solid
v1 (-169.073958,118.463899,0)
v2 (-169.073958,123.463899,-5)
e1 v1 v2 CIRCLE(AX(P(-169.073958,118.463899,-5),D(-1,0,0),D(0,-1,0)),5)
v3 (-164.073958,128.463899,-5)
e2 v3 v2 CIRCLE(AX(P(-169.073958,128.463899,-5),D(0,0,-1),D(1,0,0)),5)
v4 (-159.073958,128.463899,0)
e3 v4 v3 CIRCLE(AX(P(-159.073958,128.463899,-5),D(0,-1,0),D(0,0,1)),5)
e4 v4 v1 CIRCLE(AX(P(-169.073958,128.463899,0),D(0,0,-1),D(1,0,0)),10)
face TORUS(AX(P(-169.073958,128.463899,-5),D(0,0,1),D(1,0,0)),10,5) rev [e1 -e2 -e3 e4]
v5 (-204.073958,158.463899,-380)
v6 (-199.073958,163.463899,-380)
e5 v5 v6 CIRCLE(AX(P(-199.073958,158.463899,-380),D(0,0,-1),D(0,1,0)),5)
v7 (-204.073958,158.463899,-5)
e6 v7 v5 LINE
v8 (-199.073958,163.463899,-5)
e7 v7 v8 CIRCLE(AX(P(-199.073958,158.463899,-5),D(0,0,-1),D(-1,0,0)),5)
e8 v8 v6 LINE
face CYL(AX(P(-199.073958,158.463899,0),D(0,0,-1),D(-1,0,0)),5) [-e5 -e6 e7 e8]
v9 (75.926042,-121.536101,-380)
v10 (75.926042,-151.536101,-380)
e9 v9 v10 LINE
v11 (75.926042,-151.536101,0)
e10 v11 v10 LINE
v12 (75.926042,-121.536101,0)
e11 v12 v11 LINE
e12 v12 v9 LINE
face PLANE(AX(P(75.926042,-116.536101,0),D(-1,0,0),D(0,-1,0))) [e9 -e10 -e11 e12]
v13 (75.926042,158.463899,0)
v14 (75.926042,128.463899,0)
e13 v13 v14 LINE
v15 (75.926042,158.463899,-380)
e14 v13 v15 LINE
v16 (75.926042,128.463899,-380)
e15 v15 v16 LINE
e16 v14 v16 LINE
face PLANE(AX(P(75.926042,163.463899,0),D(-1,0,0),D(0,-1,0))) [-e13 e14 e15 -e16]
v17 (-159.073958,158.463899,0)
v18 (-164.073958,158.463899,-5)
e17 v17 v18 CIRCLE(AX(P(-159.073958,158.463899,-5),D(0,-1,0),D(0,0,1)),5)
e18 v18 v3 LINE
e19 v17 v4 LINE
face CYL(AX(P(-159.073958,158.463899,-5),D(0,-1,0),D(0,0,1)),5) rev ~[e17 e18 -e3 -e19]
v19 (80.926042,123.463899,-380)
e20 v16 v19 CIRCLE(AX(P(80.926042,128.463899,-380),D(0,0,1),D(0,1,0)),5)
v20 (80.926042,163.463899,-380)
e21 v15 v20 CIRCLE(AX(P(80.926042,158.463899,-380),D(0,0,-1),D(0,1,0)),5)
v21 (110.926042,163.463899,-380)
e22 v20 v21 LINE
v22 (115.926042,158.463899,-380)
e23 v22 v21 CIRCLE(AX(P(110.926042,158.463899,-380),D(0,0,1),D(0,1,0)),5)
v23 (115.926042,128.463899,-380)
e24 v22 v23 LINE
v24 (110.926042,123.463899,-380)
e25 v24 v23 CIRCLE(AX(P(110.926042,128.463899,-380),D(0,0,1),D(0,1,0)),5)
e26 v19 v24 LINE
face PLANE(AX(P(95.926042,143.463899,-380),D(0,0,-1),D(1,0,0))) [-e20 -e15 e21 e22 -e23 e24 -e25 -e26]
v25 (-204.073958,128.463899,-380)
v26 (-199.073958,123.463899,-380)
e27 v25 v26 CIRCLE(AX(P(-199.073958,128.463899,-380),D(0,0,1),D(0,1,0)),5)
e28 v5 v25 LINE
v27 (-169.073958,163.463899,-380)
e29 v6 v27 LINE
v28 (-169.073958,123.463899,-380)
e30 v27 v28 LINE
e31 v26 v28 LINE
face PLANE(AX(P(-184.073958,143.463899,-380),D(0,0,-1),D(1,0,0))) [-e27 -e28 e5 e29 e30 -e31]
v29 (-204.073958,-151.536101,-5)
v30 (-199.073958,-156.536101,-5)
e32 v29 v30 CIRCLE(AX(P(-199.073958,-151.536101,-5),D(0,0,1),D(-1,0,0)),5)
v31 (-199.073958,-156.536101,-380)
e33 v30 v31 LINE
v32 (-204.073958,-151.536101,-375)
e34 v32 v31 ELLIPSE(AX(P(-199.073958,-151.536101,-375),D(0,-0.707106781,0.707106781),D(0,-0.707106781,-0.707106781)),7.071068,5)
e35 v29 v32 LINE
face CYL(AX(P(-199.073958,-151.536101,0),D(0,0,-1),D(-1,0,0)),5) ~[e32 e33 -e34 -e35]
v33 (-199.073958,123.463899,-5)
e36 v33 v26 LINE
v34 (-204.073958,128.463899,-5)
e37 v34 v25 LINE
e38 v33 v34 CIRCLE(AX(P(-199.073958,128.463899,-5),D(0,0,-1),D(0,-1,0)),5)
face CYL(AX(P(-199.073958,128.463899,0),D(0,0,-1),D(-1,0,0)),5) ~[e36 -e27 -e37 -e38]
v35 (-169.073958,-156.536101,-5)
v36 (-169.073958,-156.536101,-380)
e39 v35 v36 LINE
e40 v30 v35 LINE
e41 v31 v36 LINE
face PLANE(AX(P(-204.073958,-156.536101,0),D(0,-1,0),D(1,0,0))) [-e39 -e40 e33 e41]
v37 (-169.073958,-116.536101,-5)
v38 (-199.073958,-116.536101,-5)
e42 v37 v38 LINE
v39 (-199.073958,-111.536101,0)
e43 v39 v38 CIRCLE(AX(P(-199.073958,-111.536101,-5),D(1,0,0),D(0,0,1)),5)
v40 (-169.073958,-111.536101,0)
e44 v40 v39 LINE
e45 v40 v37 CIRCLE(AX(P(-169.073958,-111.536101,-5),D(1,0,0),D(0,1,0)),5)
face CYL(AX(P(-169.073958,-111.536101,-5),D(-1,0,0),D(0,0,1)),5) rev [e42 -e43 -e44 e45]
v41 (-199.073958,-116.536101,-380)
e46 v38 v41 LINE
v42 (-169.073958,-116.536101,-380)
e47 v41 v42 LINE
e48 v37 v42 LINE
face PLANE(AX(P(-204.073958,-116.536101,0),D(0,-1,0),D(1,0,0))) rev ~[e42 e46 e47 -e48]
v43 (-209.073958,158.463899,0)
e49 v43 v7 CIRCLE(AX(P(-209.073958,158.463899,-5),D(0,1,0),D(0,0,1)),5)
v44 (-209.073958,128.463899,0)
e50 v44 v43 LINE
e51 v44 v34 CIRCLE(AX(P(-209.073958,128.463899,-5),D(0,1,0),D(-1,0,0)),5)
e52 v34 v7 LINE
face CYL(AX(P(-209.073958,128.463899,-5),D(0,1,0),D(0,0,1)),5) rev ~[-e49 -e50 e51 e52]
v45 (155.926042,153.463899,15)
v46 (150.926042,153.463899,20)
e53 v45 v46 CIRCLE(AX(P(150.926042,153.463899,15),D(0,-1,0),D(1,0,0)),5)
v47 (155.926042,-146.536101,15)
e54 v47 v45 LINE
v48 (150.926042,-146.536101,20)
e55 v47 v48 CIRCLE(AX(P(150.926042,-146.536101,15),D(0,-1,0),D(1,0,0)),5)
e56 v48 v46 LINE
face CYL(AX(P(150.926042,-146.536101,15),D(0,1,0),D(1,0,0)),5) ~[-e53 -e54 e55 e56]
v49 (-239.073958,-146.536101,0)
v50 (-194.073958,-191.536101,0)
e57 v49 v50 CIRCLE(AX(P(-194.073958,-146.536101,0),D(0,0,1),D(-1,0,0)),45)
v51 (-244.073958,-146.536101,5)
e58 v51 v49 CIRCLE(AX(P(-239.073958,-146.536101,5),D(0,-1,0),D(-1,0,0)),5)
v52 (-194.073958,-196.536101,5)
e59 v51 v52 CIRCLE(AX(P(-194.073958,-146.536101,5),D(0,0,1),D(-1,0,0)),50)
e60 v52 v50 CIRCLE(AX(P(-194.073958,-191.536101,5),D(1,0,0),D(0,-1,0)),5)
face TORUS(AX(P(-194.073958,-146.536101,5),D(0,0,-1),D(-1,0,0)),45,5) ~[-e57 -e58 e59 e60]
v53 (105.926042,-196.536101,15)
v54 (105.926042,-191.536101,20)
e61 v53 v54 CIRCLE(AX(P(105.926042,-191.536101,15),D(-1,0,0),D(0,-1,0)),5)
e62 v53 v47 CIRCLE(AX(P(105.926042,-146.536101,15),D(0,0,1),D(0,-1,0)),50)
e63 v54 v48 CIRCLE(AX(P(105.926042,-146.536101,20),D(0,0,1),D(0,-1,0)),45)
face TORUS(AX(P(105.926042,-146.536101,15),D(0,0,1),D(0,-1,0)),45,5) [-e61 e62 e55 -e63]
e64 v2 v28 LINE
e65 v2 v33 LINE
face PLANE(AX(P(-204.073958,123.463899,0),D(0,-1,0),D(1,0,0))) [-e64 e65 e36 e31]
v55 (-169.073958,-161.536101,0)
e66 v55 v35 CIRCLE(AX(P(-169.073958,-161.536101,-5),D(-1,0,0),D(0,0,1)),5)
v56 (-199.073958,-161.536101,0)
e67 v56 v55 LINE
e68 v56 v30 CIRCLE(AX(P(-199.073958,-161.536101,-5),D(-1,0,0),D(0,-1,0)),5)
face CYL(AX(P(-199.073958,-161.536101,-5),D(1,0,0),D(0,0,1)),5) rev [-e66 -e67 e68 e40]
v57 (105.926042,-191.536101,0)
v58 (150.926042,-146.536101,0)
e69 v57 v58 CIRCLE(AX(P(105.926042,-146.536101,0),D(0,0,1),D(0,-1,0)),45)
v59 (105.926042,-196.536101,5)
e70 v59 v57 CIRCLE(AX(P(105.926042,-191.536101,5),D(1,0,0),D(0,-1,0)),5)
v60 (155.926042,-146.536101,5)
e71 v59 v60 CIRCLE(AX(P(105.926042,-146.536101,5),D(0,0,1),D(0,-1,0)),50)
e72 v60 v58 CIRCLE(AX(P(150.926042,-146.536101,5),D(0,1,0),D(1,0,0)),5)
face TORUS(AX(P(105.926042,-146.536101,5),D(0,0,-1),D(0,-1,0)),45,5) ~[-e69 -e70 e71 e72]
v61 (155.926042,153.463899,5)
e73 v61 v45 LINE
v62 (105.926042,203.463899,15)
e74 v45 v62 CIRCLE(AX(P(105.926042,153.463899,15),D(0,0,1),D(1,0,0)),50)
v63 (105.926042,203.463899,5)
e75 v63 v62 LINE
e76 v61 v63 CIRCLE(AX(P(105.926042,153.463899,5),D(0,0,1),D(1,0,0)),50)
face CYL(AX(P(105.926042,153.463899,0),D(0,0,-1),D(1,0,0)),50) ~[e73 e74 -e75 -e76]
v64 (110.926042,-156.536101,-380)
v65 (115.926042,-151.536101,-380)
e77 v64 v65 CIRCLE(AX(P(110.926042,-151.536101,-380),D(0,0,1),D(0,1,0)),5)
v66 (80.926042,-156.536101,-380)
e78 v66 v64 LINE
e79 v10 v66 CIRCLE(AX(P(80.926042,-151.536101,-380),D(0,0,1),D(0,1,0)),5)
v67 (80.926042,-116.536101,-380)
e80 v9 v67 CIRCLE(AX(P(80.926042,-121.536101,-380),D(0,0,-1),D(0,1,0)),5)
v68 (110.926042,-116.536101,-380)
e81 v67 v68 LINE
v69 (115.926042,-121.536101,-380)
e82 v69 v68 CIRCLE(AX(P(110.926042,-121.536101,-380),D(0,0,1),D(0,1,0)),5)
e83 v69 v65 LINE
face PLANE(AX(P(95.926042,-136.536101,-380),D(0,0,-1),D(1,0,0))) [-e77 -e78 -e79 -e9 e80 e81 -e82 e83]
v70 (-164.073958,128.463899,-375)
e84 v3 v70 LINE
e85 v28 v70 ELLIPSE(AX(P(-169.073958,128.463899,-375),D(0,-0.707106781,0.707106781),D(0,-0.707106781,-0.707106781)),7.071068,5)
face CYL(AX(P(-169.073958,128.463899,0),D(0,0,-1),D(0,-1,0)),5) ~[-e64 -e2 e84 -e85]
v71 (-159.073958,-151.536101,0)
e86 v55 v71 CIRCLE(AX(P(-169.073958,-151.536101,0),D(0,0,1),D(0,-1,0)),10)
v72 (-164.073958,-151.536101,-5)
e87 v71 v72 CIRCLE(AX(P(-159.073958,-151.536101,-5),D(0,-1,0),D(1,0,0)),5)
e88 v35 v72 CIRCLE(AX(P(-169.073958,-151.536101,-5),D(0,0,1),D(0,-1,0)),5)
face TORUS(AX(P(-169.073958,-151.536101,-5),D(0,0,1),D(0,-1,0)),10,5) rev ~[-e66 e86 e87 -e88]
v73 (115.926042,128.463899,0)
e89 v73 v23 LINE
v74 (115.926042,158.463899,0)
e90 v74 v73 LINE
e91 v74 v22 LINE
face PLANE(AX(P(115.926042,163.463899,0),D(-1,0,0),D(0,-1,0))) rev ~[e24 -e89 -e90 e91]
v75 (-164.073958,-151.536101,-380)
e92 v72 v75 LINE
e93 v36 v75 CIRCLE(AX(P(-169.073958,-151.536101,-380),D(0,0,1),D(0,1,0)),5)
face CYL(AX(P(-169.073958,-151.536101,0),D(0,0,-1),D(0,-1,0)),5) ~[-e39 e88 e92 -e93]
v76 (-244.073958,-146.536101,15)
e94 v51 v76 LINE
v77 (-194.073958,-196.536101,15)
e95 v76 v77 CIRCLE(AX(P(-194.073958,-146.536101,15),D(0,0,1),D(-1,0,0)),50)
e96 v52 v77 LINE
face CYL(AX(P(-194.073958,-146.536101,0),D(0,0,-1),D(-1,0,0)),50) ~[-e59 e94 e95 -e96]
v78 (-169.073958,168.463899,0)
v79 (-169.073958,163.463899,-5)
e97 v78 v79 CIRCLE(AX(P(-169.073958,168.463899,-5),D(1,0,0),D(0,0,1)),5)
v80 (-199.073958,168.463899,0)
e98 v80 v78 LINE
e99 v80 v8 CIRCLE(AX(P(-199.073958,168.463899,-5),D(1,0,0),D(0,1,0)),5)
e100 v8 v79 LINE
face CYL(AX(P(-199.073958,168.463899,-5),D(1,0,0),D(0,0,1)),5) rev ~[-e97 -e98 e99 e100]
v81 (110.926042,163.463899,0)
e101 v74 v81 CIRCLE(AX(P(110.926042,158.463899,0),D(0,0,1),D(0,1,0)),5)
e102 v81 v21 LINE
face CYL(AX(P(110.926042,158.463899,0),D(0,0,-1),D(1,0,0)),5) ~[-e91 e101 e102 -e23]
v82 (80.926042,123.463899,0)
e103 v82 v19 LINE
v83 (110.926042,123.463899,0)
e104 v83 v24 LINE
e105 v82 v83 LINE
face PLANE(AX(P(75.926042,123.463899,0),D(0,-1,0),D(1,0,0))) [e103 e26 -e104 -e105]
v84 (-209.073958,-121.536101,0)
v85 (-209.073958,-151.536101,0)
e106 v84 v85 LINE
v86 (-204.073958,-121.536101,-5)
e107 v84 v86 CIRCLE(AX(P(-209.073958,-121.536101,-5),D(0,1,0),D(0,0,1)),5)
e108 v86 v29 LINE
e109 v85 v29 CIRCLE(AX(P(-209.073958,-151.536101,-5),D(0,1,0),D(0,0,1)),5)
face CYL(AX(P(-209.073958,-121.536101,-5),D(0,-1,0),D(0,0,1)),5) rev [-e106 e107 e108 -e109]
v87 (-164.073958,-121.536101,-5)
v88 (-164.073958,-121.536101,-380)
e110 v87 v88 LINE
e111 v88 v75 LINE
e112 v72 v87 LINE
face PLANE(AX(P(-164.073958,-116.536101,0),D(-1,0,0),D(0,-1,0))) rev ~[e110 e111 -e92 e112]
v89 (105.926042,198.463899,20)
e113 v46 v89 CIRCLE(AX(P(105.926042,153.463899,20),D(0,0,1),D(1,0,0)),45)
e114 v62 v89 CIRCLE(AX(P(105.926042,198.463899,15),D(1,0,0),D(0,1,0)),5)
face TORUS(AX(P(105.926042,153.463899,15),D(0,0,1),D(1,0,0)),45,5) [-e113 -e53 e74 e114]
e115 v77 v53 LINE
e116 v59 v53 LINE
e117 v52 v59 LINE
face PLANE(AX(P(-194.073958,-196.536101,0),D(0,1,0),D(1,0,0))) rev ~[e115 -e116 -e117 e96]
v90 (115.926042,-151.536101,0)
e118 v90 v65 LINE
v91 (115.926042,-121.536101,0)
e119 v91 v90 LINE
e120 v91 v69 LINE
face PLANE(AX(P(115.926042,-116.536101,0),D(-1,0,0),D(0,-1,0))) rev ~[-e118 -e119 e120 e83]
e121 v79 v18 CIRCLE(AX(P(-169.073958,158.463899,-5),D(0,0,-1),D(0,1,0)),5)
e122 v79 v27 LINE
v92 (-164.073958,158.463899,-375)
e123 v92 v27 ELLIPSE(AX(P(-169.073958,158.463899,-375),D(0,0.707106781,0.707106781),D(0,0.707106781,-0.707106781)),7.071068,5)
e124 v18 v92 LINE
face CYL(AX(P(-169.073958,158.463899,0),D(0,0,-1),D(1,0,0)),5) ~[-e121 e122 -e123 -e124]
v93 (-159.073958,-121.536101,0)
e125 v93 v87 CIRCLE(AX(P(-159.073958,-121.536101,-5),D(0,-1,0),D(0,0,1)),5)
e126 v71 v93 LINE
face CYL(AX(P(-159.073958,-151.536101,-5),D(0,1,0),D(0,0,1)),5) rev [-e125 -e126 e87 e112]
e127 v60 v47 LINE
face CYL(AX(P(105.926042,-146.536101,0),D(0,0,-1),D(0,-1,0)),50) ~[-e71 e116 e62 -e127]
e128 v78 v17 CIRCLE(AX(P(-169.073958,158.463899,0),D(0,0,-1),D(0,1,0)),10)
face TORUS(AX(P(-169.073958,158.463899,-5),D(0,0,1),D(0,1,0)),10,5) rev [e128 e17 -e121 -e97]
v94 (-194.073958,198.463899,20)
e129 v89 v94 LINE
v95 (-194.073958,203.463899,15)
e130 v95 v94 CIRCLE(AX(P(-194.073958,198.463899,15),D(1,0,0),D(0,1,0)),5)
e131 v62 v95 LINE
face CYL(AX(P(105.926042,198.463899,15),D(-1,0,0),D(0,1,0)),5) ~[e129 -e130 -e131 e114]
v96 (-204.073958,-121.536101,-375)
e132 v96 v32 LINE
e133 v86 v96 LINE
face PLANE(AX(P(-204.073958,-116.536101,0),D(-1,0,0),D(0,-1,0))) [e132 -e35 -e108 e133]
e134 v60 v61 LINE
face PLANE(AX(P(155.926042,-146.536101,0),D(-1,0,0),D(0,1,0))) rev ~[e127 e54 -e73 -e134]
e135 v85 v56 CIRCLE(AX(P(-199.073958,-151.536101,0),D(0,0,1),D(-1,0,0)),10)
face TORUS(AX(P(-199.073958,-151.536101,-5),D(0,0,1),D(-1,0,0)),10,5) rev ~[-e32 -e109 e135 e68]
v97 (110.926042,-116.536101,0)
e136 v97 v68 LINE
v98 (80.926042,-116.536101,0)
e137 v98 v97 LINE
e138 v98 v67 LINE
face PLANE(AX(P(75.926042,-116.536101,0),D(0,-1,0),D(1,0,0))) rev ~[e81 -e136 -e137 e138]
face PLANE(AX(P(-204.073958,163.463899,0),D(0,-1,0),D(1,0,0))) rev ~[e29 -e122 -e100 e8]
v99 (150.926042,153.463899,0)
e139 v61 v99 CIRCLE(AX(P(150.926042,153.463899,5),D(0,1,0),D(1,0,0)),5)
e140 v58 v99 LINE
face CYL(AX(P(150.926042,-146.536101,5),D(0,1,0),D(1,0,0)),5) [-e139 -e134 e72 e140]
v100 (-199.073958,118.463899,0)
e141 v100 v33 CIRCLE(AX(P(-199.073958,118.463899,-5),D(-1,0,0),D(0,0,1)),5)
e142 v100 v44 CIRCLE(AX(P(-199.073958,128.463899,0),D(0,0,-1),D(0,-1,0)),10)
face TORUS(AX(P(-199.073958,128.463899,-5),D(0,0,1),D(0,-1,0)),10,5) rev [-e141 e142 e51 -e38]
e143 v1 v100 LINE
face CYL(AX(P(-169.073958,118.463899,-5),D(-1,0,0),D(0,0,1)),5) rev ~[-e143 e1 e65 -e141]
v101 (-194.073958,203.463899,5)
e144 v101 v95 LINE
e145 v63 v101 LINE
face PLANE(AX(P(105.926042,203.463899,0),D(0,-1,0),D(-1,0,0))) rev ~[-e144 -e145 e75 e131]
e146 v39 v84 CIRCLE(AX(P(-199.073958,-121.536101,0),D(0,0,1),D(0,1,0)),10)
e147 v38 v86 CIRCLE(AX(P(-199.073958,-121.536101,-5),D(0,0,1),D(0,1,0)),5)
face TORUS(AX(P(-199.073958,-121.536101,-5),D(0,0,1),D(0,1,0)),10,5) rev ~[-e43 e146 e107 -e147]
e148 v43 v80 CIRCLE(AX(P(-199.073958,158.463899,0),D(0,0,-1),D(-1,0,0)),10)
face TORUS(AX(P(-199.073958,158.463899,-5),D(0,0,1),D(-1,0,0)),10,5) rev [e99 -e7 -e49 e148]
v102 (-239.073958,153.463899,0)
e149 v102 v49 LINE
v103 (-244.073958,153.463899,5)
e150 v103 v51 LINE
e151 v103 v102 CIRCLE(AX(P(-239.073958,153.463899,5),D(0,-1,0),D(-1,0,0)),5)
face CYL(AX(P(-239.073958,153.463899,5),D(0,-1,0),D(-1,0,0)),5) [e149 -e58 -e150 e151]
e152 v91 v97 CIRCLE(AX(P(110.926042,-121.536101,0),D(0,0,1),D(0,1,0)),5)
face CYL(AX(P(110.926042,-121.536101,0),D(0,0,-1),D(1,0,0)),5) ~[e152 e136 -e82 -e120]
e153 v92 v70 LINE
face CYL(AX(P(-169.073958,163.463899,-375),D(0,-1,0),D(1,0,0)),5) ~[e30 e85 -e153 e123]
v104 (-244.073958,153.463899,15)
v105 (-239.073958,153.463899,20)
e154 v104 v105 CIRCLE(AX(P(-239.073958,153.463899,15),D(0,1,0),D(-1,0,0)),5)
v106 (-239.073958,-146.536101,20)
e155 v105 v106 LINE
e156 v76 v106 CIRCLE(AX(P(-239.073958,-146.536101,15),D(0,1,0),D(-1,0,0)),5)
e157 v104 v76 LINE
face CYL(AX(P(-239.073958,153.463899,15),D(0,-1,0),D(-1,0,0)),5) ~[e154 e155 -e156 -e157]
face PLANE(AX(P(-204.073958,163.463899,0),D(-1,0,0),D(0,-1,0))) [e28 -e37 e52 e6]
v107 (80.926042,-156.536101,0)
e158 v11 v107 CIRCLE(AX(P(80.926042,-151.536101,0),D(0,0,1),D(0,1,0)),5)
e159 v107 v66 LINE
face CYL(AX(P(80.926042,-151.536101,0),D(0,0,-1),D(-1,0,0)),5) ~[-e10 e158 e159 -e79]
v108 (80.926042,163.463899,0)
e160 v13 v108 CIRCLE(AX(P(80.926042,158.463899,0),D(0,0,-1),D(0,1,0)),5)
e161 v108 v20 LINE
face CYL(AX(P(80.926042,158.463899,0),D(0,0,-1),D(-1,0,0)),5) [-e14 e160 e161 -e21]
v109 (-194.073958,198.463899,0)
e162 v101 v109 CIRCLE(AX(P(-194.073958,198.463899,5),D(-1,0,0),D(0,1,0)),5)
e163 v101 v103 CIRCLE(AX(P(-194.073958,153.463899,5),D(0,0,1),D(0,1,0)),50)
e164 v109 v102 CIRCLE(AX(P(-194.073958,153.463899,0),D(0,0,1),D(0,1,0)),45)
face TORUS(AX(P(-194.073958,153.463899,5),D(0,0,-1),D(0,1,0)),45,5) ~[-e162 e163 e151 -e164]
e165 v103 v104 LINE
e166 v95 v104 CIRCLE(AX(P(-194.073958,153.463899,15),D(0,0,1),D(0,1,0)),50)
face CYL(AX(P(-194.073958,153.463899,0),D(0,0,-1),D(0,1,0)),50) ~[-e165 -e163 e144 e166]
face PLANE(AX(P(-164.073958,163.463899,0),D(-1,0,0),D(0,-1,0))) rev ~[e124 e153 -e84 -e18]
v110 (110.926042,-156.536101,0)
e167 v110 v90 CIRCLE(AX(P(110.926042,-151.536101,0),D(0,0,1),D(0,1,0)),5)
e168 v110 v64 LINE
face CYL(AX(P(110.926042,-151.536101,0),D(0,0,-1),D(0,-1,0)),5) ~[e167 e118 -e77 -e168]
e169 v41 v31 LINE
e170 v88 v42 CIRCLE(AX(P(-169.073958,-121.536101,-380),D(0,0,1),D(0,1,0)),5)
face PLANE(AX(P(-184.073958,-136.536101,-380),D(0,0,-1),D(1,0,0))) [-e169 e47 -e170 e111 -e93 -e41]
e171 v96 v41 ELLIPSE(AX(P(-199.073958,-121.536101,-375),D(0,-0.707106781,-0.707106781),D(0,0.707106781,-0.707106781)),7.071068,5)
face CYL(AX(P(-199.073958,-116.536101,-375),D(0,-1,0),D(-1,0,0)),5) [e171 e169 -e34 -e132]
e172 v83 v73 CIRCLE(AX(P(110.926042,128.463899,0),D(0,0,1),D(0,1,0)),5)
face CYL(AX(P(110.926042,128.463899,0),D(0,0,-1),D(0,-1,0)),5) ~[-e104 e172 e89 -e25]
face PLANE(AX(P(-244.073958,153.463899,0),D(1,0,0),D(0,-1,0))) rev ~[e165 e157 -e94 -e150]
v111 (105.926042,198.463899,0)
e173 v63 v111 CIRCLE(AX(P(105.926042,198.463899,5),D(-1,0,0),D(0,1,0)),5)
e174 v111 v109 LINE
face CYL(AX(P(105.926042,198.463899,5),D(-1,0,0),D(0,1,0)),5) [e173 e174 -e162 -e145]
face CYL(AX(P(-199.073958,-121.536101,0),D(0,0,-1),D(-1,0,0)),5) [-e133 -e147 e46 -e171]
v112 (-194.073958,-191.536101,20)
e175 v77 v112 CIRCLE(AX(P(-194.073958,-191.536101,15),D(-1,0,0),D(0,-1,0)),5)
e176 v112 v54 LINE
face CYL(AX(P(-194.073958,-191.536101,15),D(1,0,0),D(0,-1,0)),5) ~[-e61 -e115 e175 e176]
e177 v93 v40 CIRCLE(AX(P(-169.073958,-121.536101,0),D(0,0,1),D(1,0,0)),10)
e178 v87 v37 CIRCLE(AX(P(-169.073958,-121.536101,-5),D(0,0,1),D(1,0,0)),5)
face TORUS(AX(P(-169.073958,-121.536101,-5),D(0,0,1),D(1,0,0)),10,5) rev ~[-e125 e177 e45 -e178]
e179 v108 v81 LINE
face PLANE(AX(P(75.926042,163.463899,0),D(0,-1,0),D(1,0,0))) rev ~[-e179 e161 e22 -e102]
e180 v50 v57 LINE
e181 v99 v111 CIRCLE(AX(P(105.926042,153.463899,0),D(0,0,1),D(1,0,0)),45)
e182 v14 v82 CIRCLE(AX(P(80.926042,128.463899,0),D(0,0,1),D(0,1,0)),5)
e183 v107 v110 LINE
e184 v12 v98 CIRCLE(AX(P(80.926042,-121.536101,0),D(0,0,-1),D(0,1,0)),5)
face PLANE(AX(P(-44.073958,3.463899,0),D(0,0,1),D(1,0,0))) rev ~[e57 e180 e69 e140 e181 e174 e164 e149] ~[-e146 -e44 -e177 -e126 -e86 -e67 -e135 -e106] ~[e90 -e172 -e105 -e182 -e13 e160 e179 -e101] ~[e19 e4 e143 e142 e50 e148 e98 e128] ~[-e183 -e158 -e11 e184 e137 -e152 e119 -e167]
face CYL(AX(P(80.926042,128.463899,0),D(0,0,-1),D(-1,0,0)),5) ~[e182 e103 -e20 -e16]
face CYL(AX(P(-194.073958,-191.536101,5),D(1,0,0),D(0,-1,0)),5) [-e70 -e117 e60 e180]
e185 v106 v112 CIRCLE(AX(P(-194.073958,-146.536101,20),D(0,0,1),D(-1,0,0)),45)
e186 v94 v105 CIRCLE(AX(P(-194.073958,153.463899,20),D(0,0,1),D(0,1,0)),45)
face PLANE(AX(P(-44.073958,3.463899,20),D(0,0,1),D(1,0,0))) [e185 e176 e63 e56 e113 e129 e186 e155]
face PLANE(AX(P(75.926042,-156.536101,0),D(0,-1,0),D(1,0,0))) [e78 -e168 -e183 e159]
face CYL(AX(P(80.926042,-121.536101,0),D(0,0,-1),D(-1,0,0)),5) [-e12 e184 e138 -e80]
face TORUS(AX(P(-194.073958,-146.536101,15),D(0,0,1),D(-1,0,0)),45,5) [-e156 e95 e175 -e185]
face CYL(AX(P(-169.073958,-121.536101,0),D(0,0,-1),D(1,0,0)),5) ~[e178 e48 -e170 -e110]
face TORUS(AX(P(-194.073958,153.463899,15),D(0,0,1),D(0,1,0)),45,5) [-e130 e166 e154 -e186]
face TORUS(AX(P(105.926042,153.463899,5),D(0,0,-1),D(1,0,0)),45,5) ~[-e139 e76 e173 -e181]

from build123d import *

# Parameters (mm, degrees)
F1_DEPTH = 20
F2_R     = 5
F3_W     = 40
F3_H     = 40
F4_DEPTH = 380
F5_F1_R  = 5
F5_F2_R  = 5
F6_R     = 5


with BuildPart() as f1:
    # F0 (on Top) → F1 (new body)
    with BuildSketch(Plane.XY):
        with BuildLine():
            Line((105.9260419756, 203.463898824), (-194.0739580244, 203.463898824))
            ThreePointArc((-194.0739580244, 203.463898824), (-229.4292970837, 188.8192378834), (-244.0739580244, 153.463898824))
            Line((-244.0739580244, 153.463898824), (-244.0739580244, -146.536101176))
            ThreePointArc((-244.0739580244, -146.536101176), (-229.4292970837, -181.8914402353), (-194.0739580244, -196.536101176))
            Line((-194.0739580244, -196.536101176), (105.9260419756, -196.536101176))
            ThreePointArc((105.9260419756, -196.536101176), (141.2813810349, -181.8914402353), (155.9260419756, -146.536101176))
            Line((155.9260419756, -146.536101176), (155.9260419756, 153.463898824))
            ThreePointArc((155.9260419756, 153.463898824), (141.2813810349, 188.8192378834), (105.9260419756, 203.463898824))
        make_face()
    extrude(amount=F1_DEPTH)

    # F2
    f2_edges = [f1.edges().sort_by_distance(p)[0] for p in [
        (-44.073958, 203.463899, 0),
        (-229.429297, 188.819238, 0),
        (-244.073958, 3.463899, 0),
        (-229.429297, -181.89144, 0),
        (-44.073958, -196.536101, 0),
        (141.281381, -181.89144, 0),
        (155.926042, 3.463899, 0),
        (141.281381, 188.819238, 0),
    ]]
    fillet(f2_edges, radius=F2_R)

    # F3 (on face) → F4 (join)
    with BuildSketch(Plane(origin=(0, 0, 0), x_dir=(1, 0, 0), z_dir=(0, 0, -1))):
        with Locations((95.9260419756, 136.536101176)):
            Rectangle(F3_W, F3_H)
        with Locations((95.9260419756, -143.463898824)):
            Rectangle(F3_W, F3_H)
        with Locations((-184.0739580244, -143.463898824)):
            Rectangle(F3_W, F3_H)
        with Locations((-184.0739580244, 136.536101176)):
            Rectangle(F3_W, F3_H)
    extrude(amount=F4_DEPTH)

    # F5: fillet of radius 5 on 20 edges, made by hand

    # F5_f1
    f5_f1_edges = [f1.edges().sort_by_distance(p)[0] for p in [
        (-164.0739580244, -156.536101176, -190),
        (-164.0739580244, -116.536101176, -190),
        (-204.0739580244, -156.536101176, -190),
        (-204.0739580244, -116.536101176, -190),
        (-204.0739580244, -136.536101176, -380),
        (75.9260419756, -156.536101176, -190),
        (115.9260419756, -156.536101176, -190),
        (115.9260419756, -116.536101176, -190),
        (75.9260419756, -116.536101176, -190),
        (115.9260419756, 123.463898824, -190),
        (115.9260419756, 163.463898824, -190),
        (75.9260419756, 163.463898824, -190),
        (75.9260419756, 123.463898824, -190),
        (-204.0739580244, 163.463898824, -190),
        (-204.0739580244, 123.463898824, -190),
        (-164.0739580244, 163.463898824, -190),
        (-164.0739580244, 123.463898824, -190),
        (-164.0739580244, 143.463898824, -380),
    ]]
    fillet(f5_f1_edges, radius=F5_F1_R)

    # F5_f2
    f5_f2_edges = [f1.edges().sort_by_distance(p)[0] for p in [
        (-204.0739580244, -136.536101176, 0),
        (-164.0739580244, 143.463898824, 0),
        (-165.5384241184, 161.99943273, 0),
        (-165.5384241184, 124.9283649181, 0),
        (-202.6094919303, -155.0716350819, 0),
        (-202.6094919303, -118.00056727, 0),
    ]]
    fillet(f5_f2_edges, radius=F5_F2_R)

    # F6
    f6_edges = [f1.edges().sort_by_distance(p)[0] for p in [
        (-44.073958, 203.463899, 20),
        (-229.429297, 188.819238, 20),
        (-244.073958, 3.463899, 20),
        (-229.429297, -181.89144, 20),
        (-44.073958, -196.536101, 20),
        (141.281381, -181.89144, 20),
        (155.926042, 3.463899, 20),
        (141.281381, 188.819238, 20),
    ]]
    fillet(f6_edges, radius=F6_R)


solid = f1.part
